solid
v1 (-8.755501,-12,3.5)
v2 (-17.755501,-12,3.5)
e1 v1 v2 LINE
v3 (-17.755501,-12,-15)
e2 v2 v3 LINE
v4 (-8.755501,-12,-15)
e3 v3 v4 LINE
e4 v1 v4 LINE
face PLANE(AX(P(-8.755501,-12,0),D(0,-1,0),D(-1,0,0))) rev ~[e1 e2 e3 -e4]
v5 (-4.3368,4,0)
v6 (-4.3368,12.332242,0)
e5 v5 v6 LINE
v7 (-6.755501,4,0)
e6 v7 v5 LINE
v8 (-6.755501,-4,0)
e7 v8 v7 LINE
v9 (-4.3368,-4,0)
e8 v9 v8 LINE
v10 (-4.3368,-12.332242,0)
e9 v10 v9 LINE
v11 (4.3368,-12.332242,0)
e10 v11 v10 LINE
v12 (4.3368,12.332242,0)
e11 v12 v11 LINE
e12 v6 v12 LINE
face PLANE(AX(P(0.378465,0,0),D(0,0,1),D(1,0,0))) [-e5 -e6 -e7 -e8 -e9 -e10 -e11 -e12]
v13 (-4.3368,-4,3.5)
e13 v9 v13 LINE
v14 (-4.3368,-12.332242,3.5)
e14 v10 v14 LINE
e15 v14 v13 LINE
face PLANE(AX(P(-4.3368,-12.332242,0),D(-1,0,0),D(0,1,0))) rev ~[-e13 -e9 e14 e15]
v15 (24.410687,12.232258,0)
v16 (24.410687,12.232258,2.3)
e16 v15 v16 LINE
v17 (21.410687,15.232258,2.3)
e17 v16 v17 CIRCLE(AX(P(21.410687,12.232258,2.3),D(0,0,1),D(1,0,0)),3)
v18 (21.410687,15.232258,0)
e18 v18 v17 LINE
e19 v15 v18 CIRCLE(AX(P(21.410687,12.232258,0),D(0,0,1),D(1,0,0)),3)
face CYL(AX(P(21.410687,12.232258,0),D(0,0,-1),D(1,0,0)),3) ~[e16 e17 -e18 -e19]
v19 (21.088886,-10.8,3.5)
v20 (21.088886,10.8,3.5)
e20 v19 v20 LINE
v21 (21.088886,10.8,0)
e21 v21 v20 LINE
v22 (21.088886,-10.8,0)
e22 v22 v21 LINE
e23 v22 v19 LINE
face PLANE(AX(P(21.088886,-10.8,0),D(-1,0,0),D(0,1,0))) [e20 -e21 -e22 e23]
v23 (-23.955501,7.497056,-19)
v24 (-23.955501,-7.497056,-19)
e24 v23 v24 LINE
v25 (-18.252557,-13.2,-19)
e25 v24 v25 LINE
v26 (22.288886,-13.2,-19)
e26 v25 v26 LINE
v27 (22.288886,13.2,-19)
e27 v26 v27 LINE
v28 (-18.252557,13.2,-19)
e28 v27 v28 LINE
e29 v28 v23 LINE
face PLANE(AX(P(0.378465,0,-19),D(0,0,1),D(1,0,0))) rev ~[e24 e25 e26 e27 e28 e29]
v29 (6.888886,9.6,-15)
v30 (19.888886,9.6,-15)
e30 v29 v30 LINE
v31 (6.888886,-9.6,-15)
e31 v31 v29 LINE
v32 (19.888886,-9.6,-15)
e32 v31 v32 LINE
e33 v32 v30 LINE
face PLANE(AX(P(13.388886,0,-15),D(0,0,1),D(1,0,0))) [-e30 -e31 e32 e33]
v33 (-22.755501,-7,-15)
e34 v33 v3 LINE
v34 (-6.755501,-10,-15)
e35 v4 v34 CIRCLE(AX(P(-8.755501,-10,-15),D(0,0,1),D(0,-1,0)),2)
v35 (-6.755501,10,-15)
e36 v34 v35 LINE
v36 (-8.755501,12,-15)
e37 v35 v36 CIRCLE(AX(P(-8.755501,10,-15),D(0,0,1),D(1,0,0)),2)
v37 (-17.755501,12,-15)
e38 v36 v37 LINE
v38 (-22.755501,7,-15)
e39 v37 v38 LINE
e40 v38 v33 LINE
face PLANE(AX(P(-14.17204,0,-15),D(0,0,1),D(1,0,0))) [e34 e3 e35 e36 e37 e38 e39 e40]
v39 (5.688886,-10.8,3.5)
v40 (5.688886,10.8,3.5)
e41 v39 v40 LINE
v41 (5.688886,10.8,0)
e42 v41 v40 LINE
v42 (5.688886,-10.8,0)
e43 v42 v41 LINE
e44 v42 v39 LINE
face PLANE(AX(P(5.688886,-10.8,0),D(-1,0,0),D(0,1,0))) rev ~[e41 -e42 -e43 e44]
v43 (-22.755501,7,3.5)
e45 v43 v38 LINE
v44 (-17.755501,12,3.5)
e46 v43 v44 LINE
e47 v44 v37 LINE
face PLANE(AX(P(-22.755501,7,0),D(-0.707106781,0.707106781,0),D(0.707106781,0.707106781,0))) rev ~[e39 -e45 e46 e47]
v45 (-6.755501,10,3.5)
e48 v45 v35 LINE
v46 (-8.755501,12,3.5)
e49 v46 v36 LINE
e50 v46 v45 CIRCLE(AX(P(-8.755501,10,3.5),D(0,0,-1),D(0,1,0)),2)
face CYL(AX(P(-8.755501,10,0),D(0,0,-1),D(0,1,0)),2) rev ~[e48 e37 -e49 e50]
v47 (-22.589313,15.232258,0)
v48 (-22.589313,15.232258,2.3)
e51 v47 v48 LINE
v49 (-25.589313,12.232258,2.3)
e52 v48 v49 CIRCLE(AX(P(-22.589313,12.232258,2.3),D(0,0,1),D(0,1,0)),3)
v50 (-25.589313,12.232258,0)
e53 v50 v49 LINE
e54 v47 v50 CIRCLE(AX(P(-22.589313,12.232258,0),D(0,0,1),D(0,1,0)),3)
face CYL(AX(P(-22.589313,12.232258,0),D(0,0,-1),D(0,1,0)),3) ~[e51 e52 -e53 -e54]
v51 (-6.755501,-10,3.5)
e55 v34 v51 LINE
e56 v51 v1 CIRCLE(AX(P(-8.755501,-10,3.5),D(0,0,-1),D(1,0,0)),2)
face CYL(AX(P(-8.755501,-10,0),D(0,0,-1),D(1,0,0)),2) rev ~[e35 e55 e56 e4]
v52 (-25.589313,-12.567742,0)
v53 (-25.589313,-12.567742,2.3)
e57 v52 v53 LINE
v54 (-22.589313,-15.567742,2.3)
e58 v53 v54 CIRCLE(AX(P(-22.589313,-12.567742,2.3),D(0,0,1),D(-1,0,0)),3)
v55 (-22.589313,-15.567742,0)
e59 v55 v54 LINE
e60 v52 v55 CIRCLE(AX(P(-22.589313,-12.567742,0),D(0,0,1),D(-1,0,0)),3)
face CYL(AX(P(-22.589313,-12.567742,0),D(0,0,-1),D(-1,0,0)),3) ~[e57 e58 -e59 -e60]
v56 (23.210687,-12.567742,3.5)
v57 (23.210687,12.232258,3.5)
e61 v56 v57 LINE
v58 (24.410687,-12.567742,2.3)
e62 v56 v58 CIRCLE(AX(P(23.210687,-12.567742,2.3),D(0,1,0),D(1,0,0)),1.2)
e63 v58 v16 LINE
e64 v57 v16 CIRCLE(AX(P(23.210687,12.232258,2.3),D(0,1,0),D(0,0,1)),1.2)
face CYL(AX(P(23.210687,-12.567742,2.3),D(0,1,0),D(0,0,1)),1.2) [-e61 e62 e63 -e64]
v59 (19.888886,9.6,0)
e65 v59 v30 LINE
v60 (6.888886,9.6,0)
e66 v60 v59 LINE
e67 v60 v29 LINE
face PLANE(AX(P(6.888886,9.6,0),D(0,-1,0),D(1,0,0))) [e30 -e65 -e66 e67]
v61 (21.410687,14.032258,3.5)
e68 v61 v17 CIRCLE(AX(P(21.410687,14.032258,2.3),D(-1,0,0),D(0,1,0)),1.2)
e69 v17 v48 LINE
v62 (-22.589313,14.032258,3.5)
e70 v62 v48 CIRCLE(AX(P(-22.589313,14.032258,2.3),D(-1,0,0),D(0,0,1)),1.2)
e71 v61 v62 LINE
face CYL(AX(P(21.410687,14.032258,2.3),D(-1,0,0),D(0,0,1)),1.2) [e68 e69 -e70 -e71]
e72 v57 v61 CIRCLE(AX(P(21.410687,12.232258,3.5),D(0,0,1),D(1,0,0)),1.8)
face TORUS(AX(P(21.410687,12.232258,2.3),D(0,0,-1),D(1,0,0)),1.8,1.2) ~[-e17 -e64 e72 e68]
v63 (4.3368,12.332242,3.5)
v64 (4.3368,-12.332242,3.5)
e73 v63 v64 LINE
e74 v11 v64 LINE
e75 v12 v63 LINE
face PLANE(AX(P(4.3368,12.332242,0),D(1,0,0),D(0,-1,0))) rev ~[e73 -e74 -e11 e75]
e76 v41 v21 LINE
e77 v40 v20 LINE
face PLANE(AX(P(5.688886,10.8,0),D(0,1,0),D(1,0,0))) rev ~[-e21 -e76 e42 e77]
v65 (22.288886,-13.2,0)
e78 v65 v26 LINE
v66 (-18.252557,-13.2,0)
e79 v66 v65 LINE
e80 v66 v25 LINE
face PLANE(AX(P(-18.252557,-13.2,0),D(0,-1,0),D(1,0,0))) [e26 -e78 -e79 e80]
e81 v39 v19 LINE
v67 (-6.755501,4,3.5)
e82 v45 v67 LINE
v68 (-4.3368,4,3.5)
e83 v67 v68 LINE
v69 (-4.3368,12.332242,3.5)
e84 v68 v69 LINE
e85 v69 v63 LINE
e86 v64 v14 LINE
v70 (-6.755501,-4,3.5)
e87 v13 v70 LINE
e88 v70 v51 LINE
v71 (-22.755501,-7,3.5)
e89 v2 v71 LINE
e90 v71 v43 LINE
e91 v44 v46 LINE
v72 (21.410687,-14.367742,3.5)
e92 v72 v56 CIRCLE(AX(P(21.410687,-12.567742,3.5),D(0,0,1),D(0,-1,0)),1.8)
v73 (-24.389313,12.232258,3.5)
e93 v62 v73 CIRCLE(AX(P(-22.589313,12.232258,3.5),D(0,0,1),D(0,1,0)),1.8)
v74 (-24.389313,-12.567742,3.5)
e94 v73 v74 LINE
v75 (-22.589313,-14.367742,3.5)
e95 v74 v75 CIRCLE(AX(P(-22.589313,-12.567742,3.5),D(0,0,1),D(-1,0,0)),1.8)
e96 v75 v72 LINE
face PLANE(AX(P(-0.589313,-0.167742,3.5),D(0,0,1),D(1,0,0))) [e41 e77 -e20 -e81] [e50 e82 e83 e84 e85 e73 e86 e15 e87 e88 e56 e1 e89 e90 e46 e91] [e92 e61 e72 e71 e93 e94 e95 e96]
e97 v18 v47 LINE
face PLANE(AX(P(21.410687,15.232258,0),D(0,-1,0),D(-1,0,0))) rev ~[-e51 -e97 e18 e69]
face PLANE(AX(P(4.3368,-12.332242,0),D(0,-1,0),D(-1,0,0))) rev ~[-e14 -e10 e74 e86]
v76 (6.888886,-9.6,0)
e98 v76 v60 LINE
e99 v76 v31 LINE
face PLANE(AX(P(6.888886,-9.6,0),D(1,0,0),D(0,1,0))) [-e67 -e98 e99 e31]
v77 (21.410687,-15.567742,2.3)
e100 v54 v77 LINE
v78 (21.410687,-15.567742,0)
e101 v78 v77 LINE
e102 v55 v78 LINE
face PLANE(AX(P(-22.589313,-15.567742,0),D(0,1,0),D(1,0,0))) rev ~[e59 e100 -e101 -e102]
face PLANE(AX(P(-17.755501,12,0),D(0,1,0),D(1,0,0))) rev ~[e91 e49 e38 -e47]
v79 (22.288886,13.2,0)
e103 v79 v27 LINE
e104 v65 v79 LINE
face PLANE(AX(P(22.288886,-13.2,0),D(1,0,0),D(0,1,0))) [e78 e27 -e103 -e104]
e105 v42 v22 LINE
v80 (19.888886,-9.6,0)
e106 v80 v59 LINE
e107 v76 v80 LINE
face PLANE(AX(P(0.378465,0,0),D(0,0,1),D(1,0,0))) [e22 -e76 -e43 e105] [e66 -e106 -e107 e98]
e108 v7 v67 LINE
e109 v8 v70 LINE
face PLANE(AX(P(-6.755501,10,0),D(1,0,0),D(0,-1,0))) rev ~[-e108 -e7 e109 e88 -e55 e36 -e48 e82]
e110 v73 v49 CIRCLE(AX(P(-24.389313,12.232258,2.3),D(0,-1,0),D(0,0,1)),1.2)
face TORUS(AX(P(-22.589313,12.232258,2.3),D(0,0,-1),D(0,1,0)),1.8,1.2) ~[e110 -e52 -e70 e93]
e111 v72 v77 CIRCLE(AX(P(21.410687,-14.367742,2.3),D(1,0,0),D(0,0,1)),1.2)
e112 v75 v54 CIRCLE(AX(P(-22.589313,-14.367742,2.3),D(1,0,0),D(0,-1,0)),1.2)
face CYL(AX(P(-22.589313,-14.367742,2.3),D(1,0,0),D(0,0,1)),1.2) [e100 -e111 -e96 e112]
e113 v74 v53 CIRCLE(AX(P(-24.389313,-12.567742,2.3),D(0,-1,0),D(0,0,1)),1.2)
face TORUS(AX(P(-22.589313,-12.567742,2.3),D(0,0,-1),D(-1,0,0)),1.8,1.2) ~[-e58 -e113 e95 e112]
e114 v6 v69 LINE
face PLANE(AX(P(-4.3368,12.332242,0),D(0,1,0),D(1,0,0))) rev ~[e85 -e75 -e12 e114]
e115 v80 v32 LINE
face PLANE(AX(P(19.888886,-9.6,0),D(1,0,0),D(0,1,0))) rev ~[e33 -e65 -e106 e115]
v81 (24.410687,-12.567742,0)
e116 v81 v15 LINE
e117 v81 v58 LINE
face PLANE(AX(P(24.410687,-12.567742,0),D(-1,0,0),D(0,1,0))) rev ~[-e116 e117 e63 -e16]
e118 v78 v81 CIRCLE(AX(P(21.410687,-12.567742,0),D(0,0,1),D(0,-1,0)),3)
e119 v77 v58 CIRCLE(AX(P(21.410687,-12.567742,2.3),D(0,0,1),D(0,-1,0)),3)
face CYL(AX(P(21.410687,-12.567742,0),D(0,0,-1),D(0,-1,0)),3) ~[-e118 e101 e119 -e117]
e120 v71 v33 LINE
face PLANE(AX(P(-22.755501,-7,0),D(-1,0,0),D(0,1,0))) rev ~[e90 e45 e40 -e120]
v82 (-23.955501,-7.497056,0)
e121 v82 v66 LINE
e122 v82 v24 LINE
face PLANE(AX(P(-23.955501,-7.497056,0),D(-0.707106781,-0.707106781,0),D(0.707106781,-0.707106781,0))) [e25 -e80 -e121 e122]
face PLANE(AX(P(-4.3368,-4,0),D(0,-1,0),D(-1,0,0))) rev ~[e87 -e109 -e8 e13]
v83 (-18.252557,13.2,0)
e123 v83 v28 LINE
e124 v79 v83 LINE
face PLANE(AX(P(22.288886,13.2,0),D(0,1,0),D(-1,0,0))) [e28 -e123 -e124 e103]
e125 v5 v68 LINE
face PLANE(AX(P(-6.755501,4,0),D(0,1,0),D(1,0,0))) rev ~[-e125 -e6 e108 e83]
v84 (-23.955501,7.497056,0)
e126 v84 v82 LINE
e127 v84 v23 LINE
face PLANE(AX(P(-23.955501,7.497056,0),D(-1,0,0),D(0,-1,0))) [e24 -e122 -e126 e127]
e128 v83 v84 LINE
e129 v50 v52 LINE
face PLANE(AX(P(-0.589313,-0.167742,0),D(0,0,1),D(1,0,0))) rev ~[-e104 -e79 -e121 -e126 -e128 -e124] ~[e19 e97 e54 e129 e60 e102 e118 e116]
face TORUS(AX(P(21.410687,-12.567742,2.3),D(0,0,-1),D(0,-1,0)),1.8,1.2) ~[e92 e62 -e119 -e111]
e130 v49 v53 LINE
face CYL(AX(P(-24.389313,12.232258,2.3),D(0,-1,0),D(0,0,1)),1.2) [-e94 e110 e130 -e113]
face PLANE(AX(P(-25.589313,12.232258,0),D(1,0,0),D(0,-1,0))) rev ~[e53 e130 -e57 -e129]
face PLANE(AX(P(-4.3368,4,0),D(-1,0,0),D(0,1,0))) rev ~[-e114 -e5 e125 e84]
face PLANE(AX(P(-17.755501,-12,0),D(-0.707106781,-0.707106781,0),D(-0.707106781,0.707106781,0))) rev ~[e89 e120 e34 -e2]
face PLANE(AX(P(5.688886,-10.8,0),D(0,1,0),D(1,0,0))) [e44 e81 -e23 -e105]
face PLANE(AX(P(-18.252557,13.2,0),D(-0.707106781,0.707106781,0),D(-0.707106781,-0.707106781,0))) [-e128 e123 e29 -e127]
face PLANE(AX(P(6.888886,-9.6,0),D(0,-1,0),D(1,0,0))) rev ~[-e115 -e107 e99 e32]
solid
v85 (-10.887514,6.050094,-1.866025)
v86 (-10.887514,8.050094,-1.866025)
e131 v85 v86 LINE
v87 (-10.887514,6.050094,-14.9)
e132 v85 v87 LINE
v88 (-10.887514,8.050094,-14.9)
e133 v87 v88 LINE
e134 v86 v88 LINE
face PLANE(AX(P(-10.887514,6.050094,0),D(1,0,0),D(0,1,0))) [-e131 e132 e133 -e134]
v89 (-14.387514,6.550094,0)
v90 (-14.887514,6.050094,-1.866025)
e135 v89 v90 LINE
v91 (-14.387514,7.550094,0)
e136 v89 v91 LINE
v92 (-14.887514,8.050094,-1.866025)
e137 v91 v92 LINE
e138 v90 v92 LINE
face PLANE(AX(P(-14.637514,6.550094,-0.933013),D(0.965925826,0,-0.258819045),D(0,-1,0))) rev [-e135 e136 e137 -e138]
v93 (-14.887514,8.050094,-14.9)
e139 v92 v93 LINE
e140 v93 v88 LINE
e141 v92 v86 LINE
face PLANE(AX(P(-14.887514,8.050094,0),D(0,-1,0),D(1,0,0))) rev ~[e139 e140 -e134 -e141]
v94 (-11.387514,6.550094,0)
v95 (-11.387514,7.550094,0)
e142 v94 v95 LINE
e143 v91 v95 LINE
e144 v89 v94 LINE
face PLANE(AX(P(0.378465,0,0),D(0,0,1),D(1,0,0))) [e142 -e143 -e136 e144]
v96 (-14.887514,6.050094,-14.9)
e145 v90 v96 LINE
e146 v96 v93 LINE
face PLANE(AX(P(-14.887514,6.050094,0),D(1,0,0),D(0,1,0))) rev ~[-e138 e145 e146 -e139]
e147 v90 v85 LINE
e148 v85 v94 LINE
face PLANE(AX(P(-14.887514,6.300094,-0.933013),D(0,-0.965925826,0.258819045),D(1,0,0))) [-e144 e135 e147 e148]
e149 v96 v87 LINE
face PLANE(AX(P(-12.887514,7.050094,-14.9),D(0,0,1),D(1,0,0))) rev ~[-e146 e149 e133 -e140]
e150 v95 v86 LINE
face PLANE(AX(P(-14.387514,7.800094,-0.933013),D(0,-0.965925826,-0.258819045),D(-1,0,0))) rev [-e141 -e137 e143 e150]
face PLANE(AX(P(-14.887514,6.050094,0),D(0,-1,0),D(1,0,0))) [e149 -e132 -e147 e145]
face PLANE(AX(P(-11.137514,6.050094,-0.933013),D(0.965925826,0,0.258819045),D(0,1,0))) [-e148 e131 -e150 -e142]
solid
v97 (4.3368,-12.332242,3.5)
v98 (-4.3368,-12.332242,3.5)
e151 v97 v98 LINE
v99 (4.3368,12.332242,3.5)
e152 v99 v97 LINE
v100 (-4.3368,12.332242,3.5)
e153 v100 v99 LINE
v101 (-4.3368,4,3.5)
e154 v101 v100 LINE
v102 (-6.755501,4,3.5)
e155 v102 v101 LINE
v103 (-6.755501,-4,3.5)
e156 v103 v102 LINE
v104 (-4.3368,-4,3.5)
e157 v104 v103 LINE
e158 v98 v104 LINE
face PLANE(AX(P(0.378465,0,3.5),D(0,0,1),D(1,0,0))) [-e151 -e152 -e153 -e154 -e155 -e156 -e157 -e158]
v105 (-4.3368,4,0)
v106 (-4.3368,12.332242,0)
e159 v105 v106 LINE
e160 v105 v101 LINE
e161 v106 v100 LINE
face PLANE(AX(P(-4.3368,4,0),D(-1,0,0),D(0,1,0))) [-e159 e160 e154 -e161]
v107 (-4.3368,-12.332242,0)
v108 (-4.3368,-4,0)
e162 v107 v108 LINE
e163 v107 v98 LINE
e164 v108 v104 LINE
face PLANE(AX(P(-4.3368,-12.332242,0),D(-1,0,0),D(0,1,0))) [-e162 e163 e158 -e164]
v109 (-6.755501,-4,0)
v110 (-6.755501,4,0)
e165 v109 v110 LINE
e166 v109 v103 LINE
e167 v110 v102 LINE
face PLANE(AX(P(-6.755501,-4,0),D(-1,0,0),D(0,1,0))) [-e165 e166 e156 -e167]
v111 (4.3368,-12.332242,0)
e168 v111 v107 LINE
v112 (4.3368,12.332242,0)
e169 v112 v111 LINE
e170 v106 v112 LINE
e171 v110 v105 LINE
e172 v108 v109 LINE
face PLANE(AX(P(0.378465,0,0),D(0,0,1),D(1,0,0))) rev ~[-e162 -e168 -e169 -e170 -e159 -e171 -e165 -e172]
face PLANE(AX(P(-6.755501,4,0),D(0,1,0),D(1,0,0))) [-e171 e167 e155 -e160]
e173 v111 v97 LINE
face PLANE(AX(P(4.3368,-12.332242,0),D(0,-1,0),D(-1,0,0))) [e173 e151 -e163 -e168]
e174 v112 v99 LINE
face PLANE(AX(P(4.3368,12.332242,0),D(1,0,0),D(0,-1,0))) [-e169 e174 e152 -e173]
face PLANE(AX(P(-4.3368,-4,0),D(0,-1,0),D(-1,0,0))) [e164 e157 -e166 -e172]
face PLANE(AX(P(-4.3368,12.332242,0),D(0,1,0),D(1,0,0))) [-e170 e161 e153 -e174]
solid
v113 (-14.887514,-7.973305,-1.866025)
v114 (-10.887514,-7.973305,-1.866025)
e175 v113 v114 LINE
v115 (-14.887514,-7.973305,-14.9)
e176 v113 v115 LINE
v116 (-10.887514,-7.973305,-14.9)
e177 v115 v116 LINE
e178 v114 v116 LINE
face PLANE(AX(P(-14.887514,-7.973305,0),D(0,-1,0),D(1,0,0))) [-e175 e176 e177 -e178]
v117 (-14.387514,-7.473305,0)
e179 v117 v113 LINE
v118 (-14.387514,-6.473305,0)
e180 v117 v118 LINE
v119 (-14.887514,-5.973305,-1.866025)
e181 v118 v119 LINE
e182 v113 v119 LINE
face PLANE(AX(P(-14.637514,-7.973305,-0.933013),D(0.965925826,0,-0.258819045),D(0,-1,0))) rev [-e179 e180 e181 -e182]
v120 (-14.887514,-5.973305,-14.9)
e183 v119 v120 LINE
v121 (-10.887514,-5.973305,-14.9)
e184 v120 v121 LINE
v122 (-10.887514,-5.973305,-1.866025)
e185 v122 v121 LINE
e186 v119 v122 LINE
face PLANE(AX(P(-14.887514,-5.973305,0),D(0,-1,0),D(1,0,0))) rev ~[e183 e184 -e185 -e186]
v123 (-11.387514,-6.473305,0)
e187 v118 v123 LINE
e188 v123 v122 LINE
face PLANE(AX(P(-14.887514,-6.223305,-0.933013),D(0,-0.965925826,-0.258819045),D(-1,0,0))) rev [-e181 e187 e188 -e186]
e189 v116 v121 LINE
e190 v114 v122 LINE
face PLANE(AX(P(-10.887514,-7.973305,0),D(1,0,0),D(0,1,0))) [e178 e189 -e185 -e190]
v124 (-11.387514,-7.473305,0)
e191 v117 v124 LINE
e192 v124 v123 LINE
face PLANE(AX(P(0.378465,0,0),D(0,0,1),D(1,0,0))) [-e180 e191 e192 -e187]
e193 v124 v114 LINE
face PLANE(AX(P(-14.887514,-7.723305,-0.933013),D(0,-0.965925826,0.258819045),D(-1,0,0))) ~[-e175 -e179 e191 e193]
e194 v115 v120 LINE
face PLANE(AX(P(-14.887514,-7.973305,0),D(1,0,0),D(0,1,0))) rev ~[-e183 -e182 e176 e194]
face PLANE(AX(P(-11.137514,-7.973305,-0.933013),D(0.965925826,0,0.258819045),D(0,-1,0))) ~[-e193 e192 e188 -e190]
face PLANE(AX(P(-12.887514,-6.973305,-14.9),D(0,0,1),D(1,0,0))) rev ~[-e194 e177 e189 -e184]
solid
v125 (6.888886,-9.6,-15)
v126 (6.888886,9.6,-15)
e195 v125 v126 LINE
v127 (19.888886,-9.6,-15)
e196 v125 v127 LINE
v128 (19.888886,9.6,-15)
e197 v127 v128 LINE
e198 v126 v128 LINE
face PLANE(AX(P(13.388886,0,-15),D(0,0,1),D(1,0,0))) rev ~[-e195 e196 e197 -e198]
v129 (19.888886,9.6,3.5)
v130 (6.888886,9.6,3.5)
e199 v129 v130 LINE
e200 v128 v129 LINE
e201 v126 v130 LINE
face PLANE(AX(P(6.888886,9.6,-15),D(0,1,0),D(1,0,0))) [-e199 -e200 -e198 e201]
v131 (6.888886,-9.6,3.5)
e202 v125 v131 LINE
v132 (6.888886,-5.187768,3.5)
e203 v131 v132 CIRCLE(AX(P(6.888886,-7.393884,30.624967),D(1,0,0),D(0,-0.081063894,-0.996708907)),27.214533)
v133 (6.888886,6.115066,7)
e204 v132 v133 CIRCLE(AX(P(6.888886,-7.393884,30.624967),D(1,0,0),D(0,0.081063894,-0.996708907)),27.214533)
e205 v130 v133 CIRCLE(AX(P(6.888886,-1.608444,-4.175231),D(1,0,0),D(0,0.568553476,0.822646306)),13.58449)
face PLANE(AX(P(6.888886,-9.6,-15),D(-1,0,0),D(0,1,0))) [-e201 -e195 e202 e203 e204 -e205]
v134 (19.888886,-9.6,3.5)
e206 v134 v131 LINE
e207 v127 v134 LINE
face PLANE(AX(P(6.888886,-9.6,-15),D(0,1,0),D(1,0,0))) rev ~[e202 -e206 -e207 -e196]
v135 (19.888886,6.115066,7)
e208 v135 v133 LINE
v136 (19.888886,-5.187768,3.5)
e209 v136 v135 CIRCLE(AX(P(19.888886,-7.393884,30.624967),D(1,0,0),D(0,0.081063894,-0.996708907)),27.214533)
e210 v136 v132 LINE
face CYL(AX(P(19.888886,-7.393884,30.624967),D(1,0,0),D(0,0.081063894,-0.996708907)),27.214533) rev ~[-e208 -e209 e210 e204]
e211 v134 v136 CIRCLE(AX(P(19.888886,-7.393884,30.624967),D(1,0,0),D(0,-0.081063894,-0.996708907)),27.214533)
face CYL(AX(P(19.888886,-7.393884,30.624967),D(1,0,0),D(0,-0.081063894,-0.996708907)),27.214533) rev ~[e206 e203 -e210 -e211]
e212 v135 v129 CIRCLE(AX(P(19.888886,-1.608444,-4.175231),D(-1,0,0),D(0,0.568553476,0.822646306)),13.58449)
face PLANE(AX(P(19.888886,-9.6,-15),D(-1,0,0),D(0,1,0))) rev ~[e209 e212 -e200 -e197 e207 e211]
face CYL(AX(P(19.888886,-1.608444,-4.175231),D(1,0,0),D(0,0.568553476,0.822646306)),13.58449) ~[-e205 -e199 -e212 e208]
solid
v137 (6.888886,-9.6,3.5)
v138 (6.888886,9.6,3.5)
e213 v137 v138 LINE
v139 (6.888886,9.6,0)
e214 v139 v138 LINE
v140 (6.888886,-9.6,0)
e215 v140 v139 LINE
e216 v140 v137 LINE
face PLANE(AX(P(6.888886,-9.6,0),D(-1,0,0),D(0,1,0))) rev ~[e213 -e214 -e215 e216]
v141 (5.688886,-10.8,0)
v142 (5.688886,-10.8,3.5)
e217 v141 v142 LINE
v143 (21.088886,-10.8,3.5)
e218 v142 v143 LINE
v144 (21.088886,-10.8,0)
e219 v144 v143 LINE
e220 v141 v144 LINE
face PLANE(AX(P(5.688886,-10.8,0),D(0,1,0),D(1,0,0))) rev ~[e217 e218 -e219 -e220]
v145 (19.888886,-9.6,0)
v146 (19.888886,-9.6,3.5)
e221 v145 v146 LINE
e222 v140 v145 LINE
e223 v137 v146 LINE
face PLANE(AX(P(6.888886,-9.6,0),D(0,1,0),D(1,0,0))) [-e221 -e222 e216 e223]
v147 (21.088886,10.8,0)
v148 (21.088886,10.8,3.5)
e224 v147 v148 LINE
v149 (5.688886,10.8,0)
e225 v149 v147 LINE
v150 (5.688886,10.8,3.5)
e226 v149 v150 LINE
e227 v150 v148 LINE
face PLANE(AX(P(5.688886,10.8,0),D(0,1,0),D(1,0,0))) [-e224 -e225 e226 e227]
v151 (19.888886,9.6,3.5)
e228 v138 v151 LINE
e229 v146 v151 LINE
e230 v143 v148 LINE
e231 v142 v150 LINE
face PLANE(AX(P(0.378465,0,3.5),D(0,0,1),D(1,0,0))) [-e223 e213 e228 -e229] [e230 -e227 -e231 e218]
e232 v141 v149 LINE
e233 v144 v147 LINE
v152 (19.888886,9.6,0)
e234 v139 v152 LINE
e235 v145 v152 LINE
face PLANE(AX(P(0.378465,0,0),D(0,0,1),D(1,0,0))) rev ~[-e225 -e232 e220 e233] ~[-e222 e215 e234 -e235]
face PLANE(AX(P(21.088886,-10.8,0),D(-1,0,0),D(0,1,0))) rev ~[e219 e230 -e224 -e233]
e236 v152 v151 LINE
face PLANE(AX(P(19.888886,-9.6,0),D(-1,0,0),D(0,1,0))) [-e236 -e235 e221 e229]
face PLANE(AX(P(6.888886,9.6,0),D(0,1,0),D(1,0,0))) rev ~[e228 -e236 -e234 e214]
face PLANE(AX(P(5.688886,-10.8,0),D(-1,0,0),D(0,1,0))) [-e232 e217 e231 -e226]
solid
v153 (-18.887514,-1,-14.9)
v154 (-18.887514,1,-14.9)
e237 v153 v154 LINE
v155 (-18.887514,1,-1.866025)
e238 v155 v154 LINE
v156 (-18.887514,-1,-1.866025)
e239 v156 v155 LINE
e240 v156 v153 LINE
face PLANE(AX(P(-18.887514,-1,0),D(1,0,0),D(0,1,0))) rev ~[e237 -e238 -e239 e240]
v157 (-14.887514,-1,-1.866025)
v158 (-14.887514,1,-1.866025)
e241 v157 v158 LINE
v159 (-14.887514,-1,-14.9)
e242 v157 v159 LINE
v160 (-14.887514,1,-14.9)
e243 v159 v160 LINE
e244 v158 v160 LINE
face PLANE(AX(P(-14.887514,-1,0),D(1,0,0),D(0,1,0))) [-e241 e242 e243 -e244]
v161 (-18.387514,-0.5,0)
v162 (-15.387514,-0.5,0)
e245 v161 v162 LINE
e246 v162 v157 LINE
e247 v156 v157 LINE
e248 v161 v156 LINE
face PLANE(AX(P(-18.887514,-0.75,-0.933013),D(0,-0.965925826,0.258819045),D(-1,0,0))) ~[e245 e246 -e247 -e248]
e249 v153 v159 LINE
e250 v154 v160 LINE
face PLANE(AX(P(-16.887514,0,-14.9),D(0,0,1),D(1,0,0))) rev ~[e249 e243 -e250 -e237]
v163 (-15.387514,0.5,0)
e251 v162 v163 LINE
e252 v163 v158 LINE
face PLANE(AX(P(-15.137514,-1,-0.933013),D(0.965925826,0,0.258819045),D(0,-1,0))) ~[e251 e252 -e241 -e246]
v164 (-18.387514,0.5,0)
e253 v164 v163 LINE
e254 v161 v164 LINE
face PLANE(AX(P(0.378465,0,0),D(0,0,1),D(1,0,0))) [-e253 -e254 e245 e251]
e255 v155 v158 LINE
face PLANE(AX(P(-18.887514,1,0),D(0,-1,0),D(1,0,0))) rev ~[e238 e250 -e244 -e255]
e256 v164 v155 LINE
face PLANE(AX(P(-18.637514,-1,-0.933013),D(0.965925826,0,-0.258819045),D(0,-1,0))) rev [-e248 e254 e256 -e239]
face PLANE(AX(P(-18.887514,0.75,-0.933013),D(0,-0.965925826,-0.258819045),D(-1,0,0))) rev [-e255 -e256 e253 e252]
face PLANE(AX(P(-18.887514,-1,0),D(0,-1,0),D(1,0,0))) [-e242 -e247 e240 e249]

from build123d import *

# Parameters (mm, degrees)
F0_W        = 15.4
F0_H        = 21.6
F1_DEPTH    = 3.5
F0_W_2      = 4
F0_H_2      = 2
F0_W_3      = 13
F0_H_3      = 19.2
F0_W_4      = 2.418700546
F0_H_4      = 8
F2_DEPTH    = 19
F3_DEPTH    = 15
F4_C1_SIZE2 = 0.5
F4_C1_SIZE  = 1.8660254038
F4_C2_SIZE2 = 0.5
F4_C2_SIZE  = 1.8660254038
F4_C3_SIZE2 = 1.8660254038
F4_C3_SIZE  = 0.5
F4_C4_SIZE2 = 1.8660254038
F4_C4_SIZE  = 0.5
F5_SIZE2    = 1.8660254038
F5_SIZE     = 0.5
F6_SIZE2    = 1.8660254038
F6_SIZE     = 0.5
F7_DEPTH    = 3.5
F8_DEPTH    = 22
F10_DEPTH   = 25
F11_R       = 1.2
F12_START   = -14.9
F12_DEPTH   = 0.1


with BuildPart() as f1:
    # F0 (on Top) → F1 (new body)
    with BuildSketch(Plane.XY):
        with BuildLine():
            Line((21.4106866419, 15.232257545), (-22.5893133581, 15.232257545))
            ThreePointArc((-22.5893133581, 15.232257545), (-24.7106337016, 14.3535778886), (-25.5893133581, 12.232257545))
            Line((-25.5893133581, 12.232257545), (-25.5893133581, -12.567742455))
            ThreePointArc((-25.5893133581, -12.567742455), (-24.7106337016, -14.6890627986), (-22.5893133581, -15.567742455))
            Line((-22.5893133581, -15.567742455), (21.4106866419, -15.567742455))
            ThreePointArc((21.4106866419, -15.567742455), (23.5320069855, -14.6890627986), (24.4106866419, -12.567742455))
            Line((24.4106866419, -12.567742455), (24.4106866419, 12.232257545))
            ThreePointArc((24.4106866419, 12.232257545), (23.5320069855, 14.3535778886), (21.4106866419, 15.232257545))
        make_face()
        Polygon((-18.2525572471, 13.2), (-8.7555009723, 13.2), (22.2888856925, 13.2), (22.2888856925, -13.2), (-8.7555009723, -13.2), (-18.2525572471, -13.2), (-23.9555009723, -7.4970562748), (-23.9555009723, 7.4970562748), align=None, mode=Mode.SUBTRACT)
        Polygon((22.2888856925, 13.2), (-8.7555009723, 13.2), (-18.2525572471, 13.2), (-23.9555009723, 7.4970562748), (-23.9555009723, -7.4970562748), (-18.2525572471, -13.2), (-8.7555009723, -13.2), (22.2888856925, -13.2), align=None)
        with BuildLine():
            Line((-4.3368004262, 4), (-4.3368004262, 12.3322419822))
            Line((-4.3368004262, 12.3322419822), (4.3368004262, 12.3322419822))
            Line((4.3368004262, 12.3322419822), (4.3368004262, -12.3322419822))
            Line((4.3368004262, -12.3322419822), (-4.3368004262, -12.3322419822))
            Line((-4.3368004262, -12.3322419822), (-4.3368004262, -4))
            Line((-4.3368004262, -4), (-6.7555009723, -4))
            Line((-6.7555009723, -4), (-6.7555009723, -10))
            ThreePointArc((-6.7555009723, -10), (-7.3412874099, -11.4142135624), (-8.7555009723, -12))
            Line((-8.7555009723, -12), (-17.7555009723, -12))
            Line((-17.7555009723, -12), (-22.7555009723, -7))
            Line((-22.7555009723, -7), (-22.7555009723, 7))
            Line((-22.7555009723, 7), (-17.7555009723, 12))
            Line((-17.7555009723, 12), (-8.7555009723, 12))
            ThreePointArc((-8.7555009723, 12), (-7.3412874099, 11.4142135624), (-6.7555009723, 10))
            Line((-6.7555009723, 10), (-6.7555009723, 4))
            Line((-6.7555009723, 4), (-4.3368004262, 4))
        make_face(mode=Mode.SUBTRACT)
        with Locations((13.3888856925, 0)):
            Rectangle(F0_W, F0_H, mode=Mode.SUBTRACT)
    extrude(amount=F1_DEPTH)

    # F0 (on Top) → F2 (join)
    with BuildSketch(Plane.XY):
        Polygon((22.2888856925, 13.2), (-8.7555009723, 13.2), (-18.2525572471, 13.2), (-23.9555009723, 7.4970562748), (-23.9555009723, -7.4970562748), (-18.2525572471, -13.2), (-8.7555009723, -13.2), (22.2888856925, -13.2), align=None)
        with BuildLine():
            Line((-4.3368004262, 4), (-4.3368004262, 12.3322419822))
            Line((-4.3368004262, 12.3322419822), (4.3368004262, 12.3322419822))
            Line((4.3368004262, 12.3322419822), (4.3368004262, -12.3322419822))
            Line((4.3368004262, -12.3322419822), (-4.3368004262, -12.3322419822))
            Line((-4.3368004262, -12.3322419822), (-4.3368004262, -4))
            Line((-4.3368004262, -4), (-6.7555009723, -4))
            Line((-6.7555009723, -4), (-6.7555009723, -10))
            ThreePointArc((-6.7555009723, -10), (-7.3412874099, -11.4142135624), (-8.7555009723, -12))
            Line((-8.7555009723, -12), (-17.7555009723, -12))
            Line((-17.7555009723, -12), (-22.7555009723, -7))
            Line((-22.7555009723, -7), (-22.7555009723, 7))
            Line((-22.7555009723, 7), (-17.7555009723, 12))
            Line((-17.7555009723, 12), (-8.7555009723, 12))
            ThreePointArc((-8.7555009723, 12), (-7.3412874099, 11.4142135624), (-6.7555009723, 10))
            Line((-6.7555009723, 10), (-6.7555009723, 4))
            Line((-6.7555009723, 4), (-4.3368004262, 4))
        make_face(mode=Mode.SUBTRACT)
        with Locations((13.3888856925, 0)):
            Rectangle(F0_W, F0_H, mode=Mode.SUBTRACT)
        with BuildLine():
            Line((-6.7555009723, -4), (-6.7555009723, 4))
            Line((-6.7555009723, 4), (-6.7555009723, 10))
            ThreePointArc((-6.7555009723, 10), (-7.3412874099, 11.4142135624), (-8.7555009723, 12))
            Line((-8.7555009723, 12), (-17.7555009723, 12))
            Line((-17.7555009723, 12), (-22.7555009723, 7))
            Line((-22.7555009723, 7), (-22.7555009723, -7))
            Line((-22.7555009723, -7), (-17.7555009723, -12))
            Line((-17.7555009723, -12), (-8.7555009723, -12))
            ThreePointArc((-8.7555009723, -12), (-7.3412874099, -11.4142135624), (-6.7555009723, -10))
            Line((-6.7555009723, -10), (-6.7555009723, -4))
        make_face()
        with Locations((-12.8875139207, -6.9733052514)):
            Rectangle(F0_W_2, F0_H_2, mode=Mode.SUBTRACT)
        with Locations((-16.8875139207, 0)):
            Rectangle(F0_W_2, F0_H_2, mode=Mode.SUBTRACT)
        with Locations((-12.8875139207, 7.0500936662)):
            Rectangle(F0_W_2, F0_H_2, mode=Mode.SUBTRACT)
        with Locations((13.3888856925, 0)):
            Rectangle(F0_W, F0_H)
        with Locations((13.3888856925, 0)):
            Rectangle(F0_W_3, F0_H_3, mode=Mode.SUBTRACT)
        with Locations((13.3888856925, 0)):
            Rectangle(F0_W_3, F0_H_3)
        Polygon((4.3368004262, 12.3322419822), (-4.3368004262, 12.3322419822), (-4.3368004262, 4), (-4.3368004262, -4), (-4.3368004262, -12.3322419822), (4.3368004262, -12.3322419822), align=None)
        with Locations((-5.5461506993, 0)):
            Rectangle(F0_W_4, F0_H_4)
        with Locations((-12.8875139207, -6.9733052514)):
            Rectangle(F0_W_2, F0_H_2)
        with Locations((-16.8875139207, 0)):
            Rectangle(F0_W_2, F0_H_2)
        with Locations((-12.8875139207, 7.0500936662)):
            Rectangle(F0_W_2, F0_H_2)
    extrude(amount=-F2_DEPTH)

    # F0 (on Top) → F3 (cut)
    with BuildSketch(Plane.XY):
        with BuildLine():
            Line((-6.7555009723, -4), (-6.7555009723, 4))
            Line((-6.7555009723, 4), (-6.7555009723, 10))
            ThreePointArc((-6.7555009723, 10), (-7.3412874099, 11.4142135624), (-8.7555009723, 12))
            Line((-8.7555009723, 12), (-17.7555009723, 12))
            Line((-17.7555009723, 12), (-22.7555009723, 7))
            Line((-22.7555009723, 7), (-22.7555009723, -7))
            Line((-22.7555009723, -7), (-17.7555009723, -12))
            Line((-17.7555009723, -12), (-8.7555009723, -12))
            ThreePointArc((-8.7555009723, -12), (-7.3412874099, -11.4142135624), (-6.7555009723, -10))
            Line((-6.7555009723, -10), (-6.7555009723, -4))
        make_face()
        with Locations((-12.8875139207, -6.9733052514)):
            Rectangle(F0_W_2, F0_H_2, mode=Mode.SUBTRACT)
        with Locations((-16.8875139207, 0)):
            Rectangle(F0_W_2, F0_H_2, mode=Mode.SUBTRACT)
        with Locations((-12.8875139207, 7.0500936662)):
            Rectangle(F0_W_2, F0_H_2, mode=Mode.SUBTRACT)
        with Locations((13.3888856925, 0)):
            Rectangle(F0_W_3, F0_H_3)
    extrude(amount=-F3_DEPTH, mode=Mode.SUBTRACT)

    # F4: chamfer of 0.5 x 1.8660254038 on 4 edges, made by hand

    # F4_c1
    f4_c1_edges = [f1.edges().sort_by_distance(p)[0] for p in [
        (-10.8875139207, 7.0500936662, 0),
    ]]
    f4_c1_side = f1.faces().sort_by_distance((-10.8875139207, 7.0500936662, -0.01))[0]
    chamfer(f4_c1_edges, length=F4_C1_SIZE, length2=F4_C1_SIZE2, reference=f4_c1_side)

    # F4_c2
    f4_c2_edges = [f1.edges().sort_by_distance(p)[0] for p in [
        (-13.1375139207, 6.0500936662, 0),
    ]]
    f4_c2_side = f1.faces().sort_by_distance((-13.1375139207, 6.0500936662, -0.01))[0]
    chamfer(f4_c2_edges, length=F4_C2_SIZE, length2=F4_C2_SIZE2, reference=f4_c2_side)

    # F4_c3
    f4_c3_edges = [f1.edges().sort_by_distance(p)[0] for p in [
        (-14.8875139207, 7.3000936662, 0),
    ]]
    f4_c3_side = f1.faces().sort_by_distance((-14.8775139207, 7.3000936662, 0))[0]
    chamfer(f4_c3_edges, length=F4_C3_SIZE, length2=F4_C3_SIZE2, reference=f4_c3_side)

    # F4_c4
    f4_c4_edges = [f1.edges().sort_by_distance(p)[0] for p in [
        (-12.8875139207, 8.0500936662, 0),
    ]]
    f4_c4_side = f1.faces().sort_by_distance((-12.8875139207, 8.0400936662, 0))[0]
    chamfer(f4_c4_edges, length=F4_C4_SIZE, length2=F4_C4_SIZE2, reference=f4_c4_side)

    # F5
    f5_edges = [f1.edges().sort_by_distance(p)[0] for p in [
        (-16.887514, 1, 0),
        (-14.887514, 0, 0),
        (-16.887514, -1, 0),
        (-18.887514, 0, 0),
    ]]
    f5_side = f1.faces().sort_by_distance((-16.887514, 0, 0))[0]
    chamfer(f5_edges, length=F5_SIZE, length2=F5_SIZE2, reference=f5_side)

    # F6
    f6_edges = [f1.edges().sort_by_distance(p)[0] for p in [
        (-14.887514, -6.973305, 0),
        (-12.887514, -5.973305, 0),
        (-10.887514, -6.973305, 0),
        (-12.887514, -7.973305, 0),
    ]]
    f6_side = f1.faces().sort_by_distance((-12.887514, -6.973305, 0))[0]
    chamfer(f6_edges, length=F6_SIZE, length2=F6_SIZE2, reference=f6_side)


with BuildPart() as f7:
    # F7 (new, through all): a face of the model
    f7_faces = [f1.part.faces().sort_by_distance(p)[0] for p in [
        (-0.4600310991, 0, 0),
    ]]
    extrude(f7_faces, amount=F7_DEPTH)


with BuildPart() as f7b:
    # F7#2 (new, through all): a face of the model
    f7_2_faces = [f1.part.faces().sort_by_distance(p)[0] for p in [
        (13.3888856925, -10.5347227865, 0),
    ]]
    extrude(f7_2_faces, amount=F7_DEPTH)


with BuildPart() as f8:
    # F8 (new): a face of the model
    f8_faces = [f1.part.faces().sort_by_distance(p)[0] for p in [
        (13.3888856925, 0, -15),
    ]]
    extrude(f8_faces, amount=F8_DEPTH)

    # F9 (on face) → F10 (cut)
    with BuildSketch(Plane.YZ.offset(19.8888856925)):
        with BuildLine():
            ThreePointArc((-9.6, 3.5), (-7.3938840069, 3.410434439), (-5.1877680138, 3.5))
            Line((-5.1877680138, 3.5), (-9.6, 3.5))
        make_face()
        with BuildLine():
            Line((-9.6, 3.5), (-5.1877680138, 3.5))
            ThreePointArc((-5.1877680138, 3.5), (0.6561669902, 4.6282852574), (6.1150655176, 7))
            Line((6.1150655176, 7), (-9.6, 7))
            Line((-9.6, 7), (-9.6, 3.5))
        make_face()
        with BuildLine():
            ThreePointArc((6.1150655176, 7), (8.0179372576, 5.4097140483), (9.6, 3.5))
            Line((9.6, 3.5), (9.6, 7))
            Line((9.6, 7), (6.1150655176, 7))
        make_face()
    extrude(amount=-F10_DEPTH, mode=Mode.SUBTRACT)


with BuildPart() as f1_1:
    add(f1.part)

    # F11
    f11_edges = [f1_1.edges().sort_by_distance(p)[0] for p in [
        (-25.589313, -0.167742, 3.5),
        (24.410687, -0.167742, 3.5),
        (23.532007, 14.353578, 3.5),
        (-0.589313, 15.232258, 3.5),
        (-24.710634, 14.353578, 3.5),
        (-24.710634, -14.689063, 3.5),
        (-0.589313, -15.567742, 3.5),
        (23.532007, -14.689063, 3.5),
    ]]
    fillet(f11_edges, radius=F11_R)

    # F0 (on Top) → F12 (cut)
    with BuildSketch(Plane.XY.offset(F12_START)):
        with Locations((-12.8875139207, 7.0500936662)):
            Rectangle(F0_W_2, F0_H_2)
        with Locations((-16.8875139207, 0)):
            Rectangle(F0_W_2, F0_H_2)
        with Locations((-12.8875139207, -6.9733052514)):
            Rectangle(F0_W_2, F0_H_2)
    extrude(amount=-F12_DEPTH, mode=Mode.SUBTRACT)


solid = Compound([f7.part, f7b.part, f8.part, f1_1.part])
